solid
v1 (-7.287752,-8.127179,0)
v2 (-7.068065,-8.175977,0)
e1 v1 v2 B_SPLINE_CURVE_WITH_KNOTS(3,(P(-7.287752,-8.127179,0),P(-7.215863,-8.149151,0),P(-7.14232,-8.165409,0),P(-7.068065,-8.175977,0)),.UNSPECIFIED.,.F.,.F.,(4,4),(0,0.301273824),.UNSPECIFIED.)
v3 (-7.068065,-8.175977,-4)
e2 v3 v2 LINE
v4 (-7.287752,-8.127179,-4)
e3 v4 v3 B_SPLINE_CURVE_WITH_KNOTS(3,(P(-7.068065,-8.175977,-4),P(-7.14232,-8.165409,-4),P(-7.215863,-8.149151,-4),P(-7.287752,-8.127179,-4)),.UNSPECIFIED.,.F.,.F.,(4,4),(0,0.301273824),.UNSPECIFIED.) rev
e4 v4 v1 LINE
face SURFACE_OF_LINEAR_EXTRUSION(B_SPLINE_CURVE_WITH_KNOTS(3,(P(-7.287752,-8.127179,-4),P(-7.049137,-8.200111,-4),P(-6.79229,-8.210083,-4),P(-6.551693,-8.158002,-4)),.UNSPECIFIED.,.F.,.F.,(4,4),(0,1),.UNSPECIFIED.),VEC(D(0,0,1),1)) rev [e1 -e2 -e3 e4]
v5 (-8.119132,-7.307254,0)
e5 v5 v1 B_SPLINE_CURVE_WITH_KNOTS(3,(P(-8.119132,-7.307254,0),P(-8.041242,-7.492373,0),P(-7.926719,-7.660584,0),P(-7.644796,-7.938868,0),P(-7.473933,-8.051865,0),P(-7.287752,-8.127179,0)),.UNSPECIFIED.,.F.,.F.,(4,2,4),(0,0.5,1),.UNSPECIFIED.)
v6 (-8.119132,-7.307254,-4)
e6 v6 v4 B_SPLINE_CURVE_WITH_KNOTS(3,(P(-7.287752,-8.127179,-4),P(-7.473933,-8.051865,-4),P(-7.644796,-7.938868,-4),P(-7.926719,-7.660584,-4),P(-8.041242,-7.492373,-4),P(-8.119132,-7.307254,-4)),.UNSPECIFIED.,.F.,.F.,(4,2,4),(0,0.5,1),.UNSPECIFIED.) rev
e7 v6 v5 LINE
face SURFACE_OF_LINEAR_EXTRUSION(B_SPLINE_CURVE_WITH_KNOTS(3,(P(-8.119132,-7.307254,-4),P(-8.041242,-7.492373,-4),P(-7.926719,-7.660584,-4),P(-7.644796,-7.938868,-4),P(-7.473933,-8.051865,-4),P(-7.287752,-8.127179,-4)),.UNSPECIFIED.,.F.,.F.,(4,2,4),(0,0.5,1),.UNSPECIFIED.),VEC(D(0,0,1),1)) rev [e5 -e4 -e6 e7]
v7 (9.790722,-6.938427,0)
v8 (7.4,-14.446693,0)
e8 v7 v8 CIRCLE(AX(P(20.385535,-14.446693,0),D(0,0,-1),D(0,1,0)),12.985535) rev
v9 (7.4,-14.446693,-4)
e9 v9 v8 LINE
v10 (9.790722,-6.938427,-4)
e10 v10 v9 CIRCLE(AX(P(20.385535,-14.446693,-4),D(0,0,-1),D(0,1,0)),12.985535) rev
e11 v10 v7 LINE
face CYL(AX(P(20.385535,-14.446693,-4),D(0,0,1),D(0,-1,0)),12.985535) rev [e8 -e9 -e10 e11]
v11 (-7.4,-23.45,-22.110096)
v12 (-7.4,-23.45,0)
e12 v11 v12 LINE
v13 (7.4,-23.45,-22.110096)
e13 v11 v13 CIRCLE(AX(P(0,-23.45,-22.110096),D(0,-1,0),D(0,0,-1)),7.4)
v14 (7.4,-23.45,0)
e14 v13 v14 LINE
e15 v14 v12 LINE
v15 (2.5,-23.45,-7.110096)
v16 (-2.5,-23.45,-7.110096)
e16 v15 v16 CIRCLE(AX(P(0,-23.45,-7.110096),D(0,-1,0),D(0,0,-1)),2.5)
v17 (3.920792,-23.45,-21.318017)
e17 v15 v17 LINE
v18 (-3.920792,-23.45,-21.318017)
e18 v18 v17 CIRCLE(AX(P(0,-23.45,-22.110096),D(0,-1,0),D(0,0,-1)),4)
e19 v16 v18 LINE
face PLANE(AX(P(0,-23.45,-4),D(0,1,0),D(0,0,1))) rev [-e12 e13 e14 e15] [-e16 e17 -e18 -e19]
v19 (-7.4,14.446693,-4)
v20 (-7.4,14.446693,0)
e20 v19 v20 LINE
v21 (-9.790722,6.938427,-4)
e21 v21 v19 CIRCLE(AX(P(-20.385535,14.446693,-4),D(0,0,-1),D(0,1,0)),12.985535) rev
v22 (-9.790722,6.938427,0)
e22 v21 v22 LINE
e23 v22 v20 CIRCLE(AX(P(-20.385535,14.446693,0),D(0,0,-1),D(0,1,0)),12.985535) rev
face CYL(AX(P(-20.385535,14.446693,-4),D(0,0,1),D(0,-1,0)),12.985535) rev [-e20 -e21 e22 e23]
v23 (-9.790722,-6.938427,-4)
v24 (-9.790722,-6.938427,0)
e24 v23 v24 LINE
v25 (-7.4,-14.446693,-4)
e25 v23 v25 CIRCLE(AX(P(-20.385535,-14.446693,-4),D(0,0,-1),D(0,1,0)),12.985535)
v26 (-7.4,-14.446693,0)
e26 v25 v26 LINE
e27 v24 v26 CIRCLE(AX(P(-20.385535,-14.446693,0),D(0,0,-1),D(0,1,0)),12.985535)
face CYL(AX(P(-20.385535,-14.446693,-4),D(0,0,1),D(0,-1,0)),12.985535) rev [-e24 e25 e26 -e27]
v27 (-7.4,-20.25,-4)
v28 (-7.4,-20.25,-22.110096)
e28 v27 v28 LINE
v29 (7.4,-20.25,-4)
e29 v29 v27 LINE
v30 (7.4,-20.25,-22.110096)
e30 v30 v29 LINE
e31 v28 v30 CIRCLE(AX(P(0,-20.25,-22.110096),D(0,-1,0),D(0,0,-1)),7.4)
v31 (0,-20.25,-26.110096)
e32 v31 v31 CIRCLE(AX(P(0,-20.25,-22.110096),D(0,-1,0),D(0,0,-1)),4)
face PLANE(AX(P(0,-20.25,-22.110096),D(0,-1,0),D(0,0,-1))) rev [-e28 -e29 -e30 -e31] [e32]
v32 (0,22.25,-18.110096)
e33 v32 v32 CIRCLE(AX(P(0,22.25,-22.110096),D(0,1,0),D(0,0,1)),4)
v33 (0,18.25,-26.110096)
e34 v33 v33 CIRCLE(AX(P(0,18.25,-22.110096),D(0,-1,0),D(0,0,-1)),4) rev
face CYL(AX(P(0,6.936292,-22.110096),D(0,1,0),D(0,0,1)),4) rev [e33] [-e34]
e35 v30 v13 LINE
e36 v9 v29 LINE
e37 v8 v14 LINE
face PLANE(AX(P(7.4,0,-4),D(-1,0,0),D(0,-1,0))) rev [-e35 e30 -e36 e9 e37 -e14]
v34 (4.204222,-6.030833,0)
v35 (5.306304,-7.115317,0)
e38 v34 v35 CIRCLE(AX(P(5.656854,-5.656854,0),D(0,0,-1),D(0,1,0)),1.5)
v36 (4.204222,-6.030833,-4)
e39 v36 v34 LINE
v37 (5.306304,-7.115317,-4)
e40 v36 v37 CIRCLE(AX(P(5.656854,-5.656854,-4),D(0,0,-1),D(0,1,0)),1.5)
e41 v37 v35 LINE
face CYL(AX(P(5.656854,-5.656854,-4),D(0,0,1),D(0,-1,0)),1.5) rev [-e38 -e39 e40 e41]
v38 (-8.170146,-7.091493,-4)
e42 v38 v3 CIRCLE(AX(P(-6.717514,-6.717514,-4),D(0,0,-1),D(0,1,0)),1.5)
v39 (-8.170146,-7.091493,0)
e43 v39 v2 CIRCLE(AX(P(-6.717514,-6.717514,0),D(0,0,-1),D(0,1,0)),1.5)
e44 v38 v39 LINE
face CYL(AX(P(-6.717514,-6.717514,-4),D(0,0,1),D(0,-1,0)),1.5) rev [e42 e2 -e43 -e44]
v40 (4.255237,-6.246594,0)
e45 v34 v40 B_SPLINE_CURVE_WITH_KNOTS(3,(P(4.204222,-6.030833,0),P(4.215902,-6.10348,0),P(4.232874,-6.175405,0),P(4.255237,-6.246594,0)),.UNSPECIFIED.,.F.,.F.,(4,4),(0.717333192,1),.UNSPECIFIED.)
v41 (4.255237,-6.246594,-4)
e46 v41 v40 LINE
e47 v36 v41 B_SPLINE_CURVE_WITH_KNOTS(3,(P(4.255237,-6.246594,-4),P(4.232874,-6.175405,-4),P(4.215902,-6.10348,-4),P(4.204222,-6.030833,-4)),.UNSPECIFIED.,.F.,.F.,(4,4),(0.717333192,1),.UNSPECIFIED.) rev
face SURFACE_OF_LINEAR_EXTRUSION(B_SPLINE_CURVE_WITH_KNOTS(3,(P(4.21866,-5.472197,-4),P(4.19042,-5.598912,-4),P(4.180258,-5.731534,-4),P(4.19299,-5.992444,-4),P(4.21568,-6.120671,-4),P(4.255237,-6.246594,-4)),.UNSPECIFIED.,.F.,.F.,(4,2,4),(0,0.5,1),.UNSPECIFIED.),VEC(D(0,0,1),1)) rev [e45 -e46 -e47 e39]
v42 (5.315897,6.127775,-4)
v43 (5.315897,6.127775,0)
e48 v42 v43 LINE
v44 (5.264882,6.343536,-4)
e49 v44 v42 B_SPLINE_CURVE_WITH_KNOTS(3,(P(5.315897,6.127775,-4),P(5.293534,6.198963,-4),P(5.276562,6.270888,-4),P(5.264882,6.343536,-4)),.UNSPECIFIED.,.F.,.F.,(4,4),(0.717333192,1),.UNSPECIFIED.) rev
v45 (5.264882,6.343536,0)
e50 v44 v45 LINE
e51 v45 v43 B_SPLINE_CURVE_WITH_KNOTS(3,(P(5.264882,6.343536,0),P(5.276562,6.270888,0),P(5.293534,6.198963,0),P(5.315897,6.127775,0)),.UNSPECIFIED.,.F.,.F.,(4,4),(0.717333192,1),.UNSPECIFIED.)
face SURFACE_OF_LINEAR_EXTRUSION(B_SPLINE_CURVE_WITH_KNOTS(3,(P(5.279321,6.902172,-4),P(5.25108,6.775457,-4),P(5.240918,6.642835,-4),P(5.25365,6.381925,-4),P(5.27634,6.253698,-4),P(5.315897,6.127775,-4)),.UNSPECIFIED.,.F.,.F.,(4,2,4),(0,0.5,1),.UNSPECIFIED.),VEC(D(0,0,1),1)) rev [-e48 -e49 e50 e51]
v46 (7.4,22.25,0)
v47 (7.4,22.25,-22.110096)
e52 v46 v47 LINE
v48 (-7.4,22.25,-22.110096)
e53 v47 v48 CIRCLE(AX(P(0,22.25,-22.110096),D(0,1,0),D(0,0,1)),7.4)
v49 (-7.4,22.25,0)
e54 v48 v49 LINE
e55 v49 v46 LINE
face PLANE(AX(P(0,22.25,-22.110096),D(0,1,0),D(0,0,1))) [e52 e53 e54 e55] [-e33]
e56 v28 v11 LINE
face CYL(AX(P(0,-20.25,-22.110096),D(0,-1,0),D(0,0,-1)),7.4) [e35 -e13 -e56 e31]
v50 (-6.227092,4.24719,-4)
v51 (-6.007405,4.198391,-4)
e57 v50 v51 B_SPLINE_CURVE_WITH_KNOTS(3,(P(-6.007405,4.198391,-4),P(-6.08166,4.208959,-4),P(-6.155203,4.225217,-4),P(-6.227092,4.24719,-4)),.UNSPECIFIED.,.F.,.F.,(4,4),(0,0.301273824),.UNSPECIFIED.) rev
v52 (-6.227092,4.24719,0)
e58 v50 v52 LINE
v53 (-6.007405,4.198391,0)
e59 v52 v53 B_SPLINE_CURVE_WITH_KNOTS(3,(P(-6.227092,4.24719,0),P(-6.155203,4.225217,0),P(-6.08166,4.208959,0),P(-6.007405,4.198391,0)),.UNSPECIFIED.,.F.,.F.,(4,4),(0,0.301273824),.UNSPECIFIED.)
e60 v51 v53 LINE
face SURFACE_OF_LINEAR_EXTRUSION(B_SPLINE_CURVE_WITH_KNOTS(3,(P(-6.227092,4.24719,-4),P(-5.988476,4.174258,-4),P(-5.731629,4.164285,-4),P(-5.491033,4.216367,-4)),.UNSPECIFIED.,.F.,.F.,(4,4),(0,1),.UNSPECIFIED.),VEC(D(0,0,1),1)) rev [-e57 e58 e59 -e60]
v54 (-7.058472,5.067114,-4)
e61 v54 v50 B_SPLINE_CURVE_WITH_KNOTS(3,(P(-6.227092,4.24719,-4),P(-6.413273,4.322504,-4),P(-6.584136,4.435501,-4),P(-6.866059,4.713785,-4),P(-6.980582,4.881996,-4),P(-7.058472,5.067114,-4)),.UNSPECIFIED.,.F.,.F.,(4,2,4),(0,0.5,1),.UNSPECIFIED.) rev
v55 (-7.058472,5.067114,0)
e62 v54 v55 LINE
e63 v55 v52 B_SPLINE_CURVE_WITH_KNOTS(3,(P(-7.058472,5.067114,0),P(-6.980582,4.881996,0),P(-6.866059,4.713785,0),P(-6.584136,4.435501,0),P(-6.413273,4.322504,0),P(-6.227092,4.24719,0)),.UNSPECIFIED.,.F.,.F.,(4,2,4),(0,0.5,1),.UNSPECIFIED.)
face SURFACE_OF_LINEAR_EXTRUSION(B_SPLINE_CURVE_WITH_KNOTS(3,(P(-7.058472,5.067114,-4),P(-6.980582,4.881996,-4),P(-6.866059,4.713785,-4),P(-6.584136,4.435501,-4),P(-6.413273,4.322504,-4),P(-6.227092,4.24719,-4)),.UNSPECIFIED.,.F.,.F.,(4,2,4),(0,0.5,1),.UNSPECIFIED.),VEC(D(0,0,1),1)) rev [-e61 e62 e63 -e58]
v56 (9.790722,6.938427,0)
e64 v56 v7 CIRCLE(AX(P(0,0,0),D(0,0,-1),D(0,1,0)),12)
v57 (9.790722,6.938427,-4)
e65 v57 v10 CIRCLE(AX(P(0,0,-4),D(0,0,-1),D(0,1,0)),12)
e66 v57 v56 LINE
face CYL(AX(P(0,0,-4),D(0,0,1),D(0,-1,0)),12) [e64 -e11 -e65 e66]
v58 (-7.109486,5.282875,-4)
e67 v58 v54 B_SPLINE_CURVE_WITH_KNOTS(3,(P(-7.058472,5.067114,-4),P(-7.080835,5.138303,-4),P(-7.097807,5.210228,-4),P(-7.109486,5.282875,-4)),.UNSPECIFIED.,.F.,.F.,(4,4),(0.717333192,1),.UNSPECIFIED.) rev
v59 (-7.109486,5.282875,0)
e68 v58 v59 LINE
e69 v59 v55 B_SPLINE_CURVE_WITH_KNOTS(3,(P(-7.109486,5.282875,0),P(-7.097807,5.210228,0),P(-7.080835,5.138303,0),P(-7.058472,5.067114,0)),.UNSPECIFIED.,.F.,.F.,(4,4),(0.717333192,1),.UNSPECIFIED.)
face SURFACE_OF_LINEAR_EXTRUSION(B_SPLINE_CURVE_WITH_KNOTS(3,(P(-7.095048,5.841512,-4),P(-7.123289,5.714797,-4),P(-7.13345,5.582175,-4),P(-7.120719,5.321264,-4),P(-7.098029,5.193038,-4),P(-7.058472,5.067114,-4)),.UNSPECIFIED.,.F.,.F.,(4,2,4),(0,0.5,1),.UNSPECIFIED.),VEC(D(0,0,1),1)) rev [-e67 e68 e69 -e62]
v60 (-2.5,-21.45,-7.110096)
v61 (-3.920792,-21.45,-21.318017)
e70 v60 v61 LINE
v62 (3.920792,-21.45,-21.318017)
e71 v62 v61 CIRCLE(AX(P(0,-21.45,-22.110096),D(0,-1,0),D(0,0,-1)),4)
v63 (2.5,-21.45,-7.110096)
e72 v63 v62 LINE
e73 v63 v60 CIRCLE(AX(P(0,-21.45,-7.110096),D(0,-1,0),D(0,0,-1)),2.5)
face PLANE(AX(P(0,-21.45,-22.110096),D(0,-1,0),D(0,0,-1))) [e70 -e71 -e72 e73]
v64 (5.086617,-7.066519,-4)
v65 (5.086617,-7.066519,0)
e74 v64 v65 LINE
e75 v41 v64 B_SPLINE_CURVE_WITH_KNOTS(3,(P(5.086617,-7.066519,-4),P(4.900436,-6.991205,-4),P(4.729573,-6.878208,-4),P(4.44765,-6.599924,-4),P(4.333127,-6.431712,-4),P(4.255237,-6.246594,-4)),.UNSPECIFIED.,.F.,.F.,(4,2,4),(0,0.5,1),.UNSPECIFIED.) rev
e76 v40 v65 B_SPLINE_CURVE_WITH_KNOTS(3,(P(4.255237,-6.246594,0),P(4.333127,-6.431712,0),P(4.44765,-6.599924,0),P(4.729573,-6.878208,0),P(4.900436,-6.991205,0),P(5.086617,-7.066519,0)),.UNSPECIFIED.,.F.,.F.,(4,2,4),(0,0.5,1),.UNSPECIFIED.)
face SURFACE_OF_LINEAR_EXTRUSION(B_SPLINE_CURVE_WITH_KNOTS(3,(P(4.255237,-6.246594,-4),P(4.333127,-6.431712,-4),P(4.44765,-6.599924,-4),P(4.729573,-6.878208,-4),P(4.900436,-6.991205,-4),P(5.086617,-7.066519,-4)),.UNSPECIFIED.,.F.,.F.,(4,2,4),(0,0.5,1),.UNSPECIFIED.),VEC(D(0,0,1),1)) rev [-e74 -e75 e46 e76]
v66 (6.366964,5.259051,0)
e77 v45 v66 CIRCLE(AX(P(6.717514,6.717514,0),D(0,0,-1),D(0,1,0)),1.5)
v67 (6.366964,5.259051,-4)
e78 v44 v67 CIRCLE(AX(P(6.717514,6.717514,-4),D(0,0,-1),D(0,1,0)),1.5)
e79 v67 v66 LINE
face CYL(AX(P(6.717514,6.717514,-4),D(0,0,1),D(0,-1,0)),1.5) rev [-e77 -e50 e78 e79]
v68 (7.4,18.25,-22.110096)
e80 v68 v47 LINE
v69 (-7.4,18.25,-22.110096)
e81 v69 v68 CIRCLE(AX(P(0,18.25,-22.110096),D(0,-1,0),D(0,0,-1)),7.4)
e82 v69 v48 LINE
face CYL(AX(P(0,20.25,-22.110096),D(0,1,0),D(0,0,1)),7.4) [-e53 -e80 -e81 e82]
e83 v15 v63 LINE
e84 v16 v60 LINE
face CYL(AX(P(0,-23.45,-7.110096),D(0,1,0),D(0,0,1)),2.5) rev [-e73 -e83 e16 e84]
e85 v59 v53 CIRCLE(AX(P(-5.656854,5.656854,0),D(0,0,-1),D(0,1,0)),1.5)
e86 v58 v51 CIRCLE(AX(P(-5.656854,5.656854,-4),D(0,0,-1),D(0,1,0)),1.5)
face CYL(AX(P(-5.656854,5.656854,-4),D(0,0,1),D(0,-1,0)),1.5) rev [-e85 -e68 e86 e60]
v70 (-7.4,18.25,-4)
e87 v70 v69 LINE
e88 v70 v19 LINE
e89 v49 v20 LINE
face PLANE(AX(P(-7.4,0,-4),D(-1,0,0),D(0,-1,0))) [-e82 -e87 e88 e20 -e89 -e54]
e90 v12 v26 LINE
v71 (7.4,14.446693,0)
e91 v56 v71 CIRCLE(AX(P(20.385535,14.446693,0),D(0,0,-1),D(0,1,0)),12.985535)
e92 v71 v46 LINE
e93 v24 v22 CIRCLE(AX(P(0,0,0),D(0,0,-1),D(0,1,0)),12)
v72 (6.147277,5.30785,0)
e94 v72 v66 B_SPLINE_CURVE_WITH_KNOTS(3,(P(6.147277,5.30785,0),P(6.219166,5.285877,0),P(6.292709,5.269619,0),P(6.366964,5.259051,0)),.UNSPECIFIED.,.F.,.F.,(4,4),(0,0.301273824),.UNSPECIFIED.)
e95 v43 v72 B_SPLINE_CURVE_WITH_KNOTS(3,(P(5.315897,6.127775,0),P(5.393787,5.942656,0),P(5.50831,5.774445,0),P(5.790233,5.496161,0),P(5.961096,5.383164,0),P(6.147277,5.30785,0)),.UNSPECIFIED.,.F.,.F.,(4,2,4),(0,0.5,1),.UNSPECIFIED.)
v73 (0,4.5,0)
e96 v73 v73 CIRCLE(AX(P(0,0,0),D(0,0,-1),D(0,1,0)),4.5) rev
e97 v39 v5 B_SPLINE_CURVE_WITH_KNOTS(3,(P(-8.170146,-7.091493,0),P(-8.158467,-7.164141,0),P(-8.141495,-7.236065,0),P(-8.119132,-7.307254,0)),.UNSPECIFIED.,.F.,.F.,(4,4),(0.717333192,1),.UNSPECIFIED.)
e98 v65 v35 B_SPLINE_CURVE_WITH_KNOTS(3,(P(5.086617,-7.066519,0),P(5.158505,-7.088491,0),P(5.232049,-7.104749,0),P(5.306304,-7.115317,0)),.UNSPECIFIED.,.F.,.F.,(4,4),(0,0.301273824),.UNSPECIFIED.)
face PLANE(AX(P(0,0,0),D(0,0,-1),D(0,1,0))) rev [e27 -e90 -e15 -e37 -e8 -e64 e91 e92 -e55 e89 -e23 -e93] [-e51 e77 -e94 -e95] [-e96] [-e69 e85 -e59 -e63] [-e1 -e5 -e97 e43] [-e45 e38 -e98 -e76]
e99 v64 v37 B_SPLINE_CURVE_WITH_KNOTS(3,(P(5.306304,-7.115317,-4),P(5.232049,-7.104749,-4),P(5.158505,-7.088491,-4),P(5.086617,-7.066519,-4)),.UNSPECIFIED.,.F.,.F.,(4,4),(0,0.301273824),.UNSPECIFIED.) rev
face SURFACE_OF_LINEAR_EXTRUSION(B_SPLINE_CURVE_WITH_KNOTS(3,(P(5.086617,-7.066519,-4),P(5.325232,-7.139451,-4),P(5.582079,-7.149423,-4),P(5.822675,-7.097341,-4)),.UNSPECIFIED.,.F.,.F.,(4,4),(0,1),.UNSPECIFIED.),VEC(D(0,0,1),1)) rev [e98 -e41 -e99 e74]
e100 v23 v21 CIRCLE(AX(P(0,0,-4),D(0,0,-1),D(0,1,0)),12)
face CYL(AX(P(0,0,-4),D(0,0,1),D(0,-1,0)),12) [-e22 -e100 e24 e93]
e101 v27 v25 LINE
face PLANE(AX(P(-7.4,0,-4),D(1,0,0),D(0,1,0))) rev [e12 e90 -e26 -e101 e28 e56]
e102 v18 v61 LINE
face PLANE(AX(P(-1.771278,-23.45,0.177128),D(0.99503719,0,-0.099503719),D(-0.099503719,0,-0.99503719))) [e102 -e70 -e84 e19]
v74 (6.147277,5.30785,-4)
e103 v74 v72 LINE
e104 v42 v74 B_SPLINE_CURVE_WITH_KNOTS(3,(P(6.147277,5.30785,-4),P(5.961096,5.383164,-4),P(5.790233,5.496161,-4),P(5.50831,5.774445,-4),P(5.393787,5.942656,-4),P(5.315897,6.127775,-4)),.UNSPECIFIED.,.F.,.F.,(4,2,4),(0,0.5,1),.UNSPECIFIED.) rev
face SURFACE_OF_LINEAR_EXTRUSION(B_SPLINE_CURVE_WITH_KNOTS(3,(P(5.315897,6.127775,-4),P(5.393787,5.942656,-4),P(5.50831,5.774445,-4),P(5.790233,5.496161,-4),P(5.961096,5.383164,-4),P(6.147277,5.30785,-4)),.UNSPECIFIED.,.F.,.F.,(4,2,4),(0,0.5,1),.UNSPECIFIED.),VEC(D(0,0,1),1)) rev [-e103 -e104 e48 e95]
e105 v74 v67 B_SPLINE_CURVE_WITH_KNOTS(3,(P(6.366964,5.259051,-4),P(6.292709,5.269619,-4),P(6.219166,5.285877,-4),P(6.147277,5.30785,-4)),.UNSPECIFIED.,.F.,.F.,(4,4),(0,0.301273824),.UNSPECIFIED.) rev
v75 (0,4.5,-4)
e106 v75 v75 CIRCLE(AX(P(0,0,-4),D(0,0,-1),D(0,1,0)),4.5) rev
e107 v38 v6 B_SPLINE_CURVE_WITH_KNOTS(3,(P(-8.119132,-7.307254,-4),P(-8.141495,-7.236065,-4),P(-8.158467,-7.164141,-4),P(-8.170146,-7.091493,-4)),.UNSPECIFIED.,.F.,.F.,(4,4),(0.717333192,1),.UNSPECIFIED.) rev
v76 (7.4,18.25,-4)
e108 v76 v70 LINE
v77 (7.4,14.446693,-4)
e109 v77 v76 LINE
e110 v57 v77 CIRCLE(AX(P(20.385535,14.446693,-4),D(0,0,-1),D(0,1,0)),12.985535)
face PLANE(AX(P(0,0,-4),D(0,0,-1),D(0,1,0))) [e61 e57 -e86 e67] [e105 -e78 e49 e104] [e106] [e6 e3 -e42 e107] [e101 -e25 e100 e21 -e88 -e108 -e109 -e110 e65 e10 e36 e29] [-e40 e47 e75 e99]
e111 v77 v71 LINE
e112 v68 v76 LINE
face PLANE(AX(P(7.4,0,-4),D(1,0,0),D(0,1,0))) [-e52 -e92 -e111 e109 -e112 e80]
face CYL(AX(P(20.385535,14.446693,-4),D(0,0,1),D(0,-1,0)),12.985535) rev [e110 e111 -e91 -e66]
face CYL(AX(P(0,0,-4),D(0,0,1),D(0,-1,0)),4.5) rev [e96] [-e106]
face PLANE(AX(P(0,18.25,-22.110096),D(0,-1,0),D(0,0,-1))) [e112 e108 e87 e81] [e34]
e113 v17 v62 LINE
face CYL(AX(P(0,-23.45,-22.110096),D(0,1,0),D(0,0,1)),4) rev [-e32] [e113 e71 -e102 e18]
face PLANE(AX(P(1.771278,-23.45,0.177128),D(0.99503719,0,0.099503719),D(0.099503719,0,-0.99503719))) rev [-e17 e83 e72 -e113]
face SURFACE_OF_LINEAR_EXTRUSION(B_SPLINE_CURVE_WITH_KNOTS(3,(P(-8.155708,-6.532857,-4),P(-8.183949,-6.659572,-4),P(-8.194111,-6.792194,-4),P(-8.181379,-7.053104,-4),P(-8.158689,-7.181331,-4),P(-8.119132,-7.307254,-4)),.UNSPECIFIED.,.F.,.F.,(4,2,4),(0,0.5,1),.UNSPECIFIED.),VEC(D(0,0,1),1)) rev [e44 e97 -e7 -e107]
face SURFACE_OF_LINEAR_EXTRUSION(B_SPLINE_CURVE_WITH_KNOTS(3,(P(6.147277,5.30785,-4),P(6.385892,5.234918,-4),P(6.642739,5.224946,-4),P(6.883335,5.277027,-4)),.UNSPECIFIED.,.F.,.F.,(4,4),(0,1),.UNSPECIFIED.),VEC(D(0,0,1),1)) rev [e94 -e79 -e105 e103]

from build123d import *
from build123d.topology import SkipClean

# Parameters (mm, degrees)
BOSS_EXTRUDE1_OUTLINE_R = 4.5
BOSS_EXTRUDE1_DEPTH     = 4
BOSS_EXTRUDE2_START     = -2
BOSS_EXTRUDE2_DEPTH     = 1.2
BOSS_EXTRUDE3_DEPTH     = 2
BOSS_EXTRUDE4_DEPTH     = 2
BOSS_EXTRUDE5_DEPTH     = 2
CUT_EXTRUDE3_DEPTH      = 1.2
SKETCH12_R              = 4
CUT_EXTRUDE4_DEPTH      = 4
SKETCH8_R               = 1.5
CUT_EXTRUDE1_DEPTH      = 56.707591784
CUT_EXTRUDE2_START      = -15
SKETCH9_R               = 4
CUT_EXTRUDE2_DEPTH      = 15


# Read off the part's stored shape, not the designer's step: Boss-Extrude1
with BuildPart() as part:
    # Boss-Extrude1 outline → Boss-Extrude1 (new body)
    with BuildSketch(Plane(origin=(0, 0, 0), x_dir=(-1, 0, 0), z_dir=(0, 0, -1))):
        with BuildLine():
            Line((-7.4, 23.45), (-7.4, 14.446692543))
            ThreePointArc((-7.4, 14.446692543), (-8.012107067, 10.506844717), (-9.790721745, 6.938426891))
            ThreePointArc((-9.790721745, 6.938426891), (-12, 0), (-9.790721745, -6.938426891))
            ThreePointArc((-9.790721745, -6.938426891), (-8.012107067, -10.506844717), (-7.4, -14.446692543))
            Line((-7.4, -14.446692543), (-7.4, -23.45))
            Line((-7.4, -23.45), (7.4, -23.45))
            Line((7.4, -23.45), (7.4, -14.446692543))
            ThreePointArc((7.4, -14.446692543), (8.012107067, -10.506844717), (9.790721745, -6.938426891))
            ThreePointArc((9.790721745, -6.938426891), (12, 0), (9.790721745, 6.938426891))
            ThreePointArc((9.790721745, 6.938426891), (8.012107067, 10.506844717), (7.4, 14.446692543))
            Line((7.4, 14.446692543), (7.4, 23.45))
            Line((7.4, 23.45), (-7.4, 23.45))
        make_face()
        with BuildLine():
            add(Edge.make_bspline(
                [(-5.08661691, -7.066518716), (-5.158505421, -7.088491281), (-5.232048751, -7.104749218), (-5.306303966, -7.11531731)],
                knots=[0, 0, 0, 0, 0.301273824, 0.301273824, 0.301273824, 0.301273824], degree=3))
            ThreePointArc((-5.306303966, -7.11531731), (-6.708944151, -4.587692504), (-4.204222203, -6.030833041))
            add(Edge.make_bspline(
                [(-4.204222203, -6.030833041), (-4.215901752, -6.103480441), (-4.232873947, -6.175405229), (-4.255236782, -6.246594027)],
                knots=[0.717333192, 0.717333192, 0.717333192, 0.717333192, 1, 1, 1, 1], degree=3))
            add(Edge.make_bspline(
                [(-4.255236782, -6.246594027), (-4.333126561, -6.431712412), (-4.447649884, -6.599923699), (-4.729572884, -6.878207782), (-4.900435719, -6.991204718), (-5.08661691, -7.066518716)],
                knots=[0, 0, 0, 0, 0.5, 0.5, 1, 1, 1, 1], degree=3))
        make_face(mode=Mode.SUBTRACT)
        with BuildLine():
            add(Edge.make_bspline(
                [(7.28775176, -8.127178888), (7.215863249, -8.149151453), (7.14231992, -8.16540939), (7.068064705, -8.175977482)],
                knots=[0, 0, 0, 0, 0.301273824, 0.301273824, 0.301273824, 0.301273824], degree=3))
            ThreePointArc((7.068064705, -8.175977482), (5.665424519, -5.648352676), (8.170146468, -7.091493213))
            add(Edge.make_bspline(
                [(8.170146468, -7.091493213), (8.158466918, -7.164140613), (8.141494724, -7.236065401), (8.119131889, -7.307254199)],
                knots=[0.717333192, 0.717333192, 0.717333192, 0.717333192, 1, 1, 1, 1], degree=3))
            add(Edge.make_bspline(
                [(8.119131889, -7.307254199), (8.04124211, -7.492372584), (7.926718787, -7.66058387), (7.644795787, -7.938867954), (7.473932951, -8.05186489), (7.28775176, -8.127178888)],
                knots=[0, 0, 0, 0, 0.5, 0.5, 1, 1, 1, 1], degree=3))
        make_face(mode=Mode.SUBTRACT)
        with BuildLine():
            add(Edge.make_bspline(
                [(-6.147277082, 5.307849955), (-6.219165593, 5.28587739), (-6.292708922, 5.269619453), (-6.366964138, 5.259051361)],
                knots=[0, 0, 0, 0, 0.301273824, 0.301273824, 0.301273824, 0.301273824], degree=3))
            ThreePointArc((-6.366964138, 5.259051361), (-7.769604322, 7.786676168), (-5.264882374, 6.34353563))
            add(Edge.make_bspline(
                [(-5.264882374, 6.34353563), (-5.276561924, 6.27088823), (-5.293534119, 6.198963441), (-5.315896954, 6.127774644)],
                knots=[0.717333192, 0.717333192, 0.717333192, 0.717333192, 1, 1, 1, 1], degree=3))
            add(Edge.make_bspline(
                [(-5.315896954, 6.127774644), (-5.393786733, 5.942656259), (-5.508310056, 5.774444972), (-5.790233055, 5.496160889), (-5.961095891, 5.383163953), (-6.147277082, 5.307849955)],
                knots=[0, 0, 0, 0, 0.5, 0.5, 1, 1, 1, 1], degree=3))
        make_face(mode=Mode.SUBTRACT)
        Circle(BOSS_EXTRUDE1_OUTLINE_R, mode=Mode.SUBTRACT)
        with BuildLine():
            add(Edge.make_bspline(
                [(6.227091589, 4.247189783), (6.155203078, 4.225217218), (6.081659748, 4.208959281), (6.007404533, 4.198391189)],
                knots=[0, 0, 0, 0, 0.301273824, 0.301273824, 0.301273824, 0.301273824], degree=3))
            ThreePointArc((6.007404533, 4.198391189), (4.604764348, 6.726015995), (7.109486296, 5.282875458))
            add(Edge.make_bspline(
                [(7.109486296, 5.282875458), (7.097806747, 5.210228058), (7.080834552, 5.13830327), (7.058471717, 5.067114472)],
                knots=[0.717333192, 0.717333192, 0.717333192, 0.717333192, 1, 1, 1, 1], degree=3))
            add(Edge.make_bspline(
                [(7.058471717, 5.067114472), (6.980581938, 4.881996087), (6.866058615, 4.7137848), (6.584135615, 4.435500717), (6.41327278, 4.322503781), (6.227091589, 4.247189783)],
                knots=[0, 0, 0, 0, 0.5, 0.5, 1, 1, 1, 1], degree=3))
        make_face(mode=Mode.SUBTRACT)
    extrude(amount=BOSS_EXTRUDE1_DEPTH)

    # Sketch4 → Boss-Extrude2 (add)
    with BuildSketch(Plane(origin=(0, -23.45, 0), x_dir=(-1, 0, 0), z_dir=(0, -1, 0)).offset(BOSS_EXTRUDE2_START)):
        with BuildLine():
            Line((-7.4, 4), (-7.4, 22.110096084))
            ThreePointArc((-7.4, 22.110096084), (0, 29.510096084), (7.4, 22.110096084))
            Line((7.4, 22.110096084), (7.4, 4))
            Line((7.4, 4), (-7.4, 4))
        make_face()
    boss_extrude2 = extrude(amount=-BOSS_EXTRUDE2_DEPTH)

    # Mirror1: Boss-Extrude2 across plane
    add(boss_extrude2.mirror(Plane.ZX))

    # Sketch6 → Boss-Extrude3 (add)
    with BuildSketch(Plane.XZ.offset(21.45)):
        with BuildLine():
            ThreePointArc((-7.4, -22.110096084), (0, -29.510096084), (7.4, -22.110096084))
            Line((7.4, -22.110096084), (7.4, -4))
            Line((7.4, -4), (-7.4, -4))
            Line((-7.4, -4), (-7.4, -22.110096084))
        make_face()
        with BuildLine():
            Line((-3.920792079, -21.318016876), (-2.5, -7.110096084))
            ThreePointArc((-2.5, -7.110096084), (0, -4.610096084), (2.5, -7.110096084))
            Line((2.5, -7.110096084), (3.920792079, -21.318016876))
            ThreePointArc((3.920792079, -21.318016876), (3.980148761, -21.712081207), (4, -22.110096084))
            ThreePointArc((4, -22.110096084), (0, -26.110096084), (-4, -22.110096084))
            ThreePointArc((-4, -22.110096084), (-3.980148761, -21.712081207), (-3.920792079, -21.318016876))
        make_face(mode=Mode.SUBTRACT)
    extrude(amount=BOSS_EXTRUDE3_DEPTH)

    # Sketch7 → Boss-Extrude4 (add)
    with BuildSketch(Plane(origin=(0, 21.45, 0), x_dir=(1, 0, 0), z_dir=(0, 1, 0))):
        with BuildLine():
            Line((-7.4, 22.110096084), (-7.4, 4))
            Line((-7.4, 4), (7.4, 4))
            Line((7.4, 4), (7.4, 22.110096084))
            ThreePointArc((7.4, 22.110096084), (0, 29.510096084), (-7.4, 22.110096084))
        make_face()
    extrude(amount=BOSS_EXTRUDE4_DEPTH)

    # Sketch10 → Boss-Extrude5 (add)
    with BuildSketch(Plane.XZ.offset(-20.25)):
        with BuildLine():
            Line((7.4, -4), (-7.4, -4))
            Line((-7.4, -4), (-7.4, -22.110096084))
            ThreePointArc((-7.4, -22.110096084), (0, -29.510096084), (7.4, -22.110096084))
            Line((7.4, -22.110096084), (7.4, -4))
        make_face()
    extrude(amount=BOSS_EXTRUDE5_DEPTH)

    # Sketch11 → Cut-Extrude3 (cut)
    with BuildSketch(Plane(origin=(0, 23.45, 0), x_dir=(1, 0, 0), z_dir=(0, 1, 0))):
        with BuildLine():
            Line((-7.4, 0), (7.4, 0))
            Line((7.4, 0), (7.4, 22.110096084))
            ThreePointArc((7.4, 22.110096084), (0, 29.510096084), (-7.4, 22.110096084))
            Line((-7.4, 22.110096084), (-7.4, 0))
        make_face()
    extrude(amount=-CUT_EXTRUDE3_DEPTH, mode=Mode.SUBTRACT)

    # Sketch12 → Cut-Extrude4 (cut)
    with BuildSketch(Plane(origin=(0, 22.25, 0), x_dir=(1, 0, 0), z_dir=(0, 1, 0))):
        with Locations(Location((0, 22.110096084, 0), (0, 0, 270))):
            Circle(SKETCH12_R)
    extrude(amount=-CUT_EXTRUDE4_DEPTH, mode=Mode.SUBTRACT)

    # Sketch8 → Cut-Extrude1 (cut, through all)
    with BuildSketch(Plane.XZ.offset(23.45)):
        with Locations(Location((0, -22.110096084, 0), (0, 0, 270))):
            Circle(SKETCH8_R)
    extrude(amount=-CUT_EXTRUDE1_DEPTH, mode=Mode.SUBTRACT)

    # Sketch9 → Cut-Extrude2 (cut)
    with SkipClean():  # the faces are left unmerged after this step: merging them gives an invalid solid
        with BuildSketch(Plane.XZ.offset(23.45).offset(CUT_EXTRUDE2_START)):
            with Locations(Location((0, -22.110096084, 0), (0, 0, 11.421186275))):
                Circle(SKETCH9_R)
        extrude(amount=CUT_EXTRUDE2_DEPTH, mode=Mode.SUBTRACT)


solid = part.part
